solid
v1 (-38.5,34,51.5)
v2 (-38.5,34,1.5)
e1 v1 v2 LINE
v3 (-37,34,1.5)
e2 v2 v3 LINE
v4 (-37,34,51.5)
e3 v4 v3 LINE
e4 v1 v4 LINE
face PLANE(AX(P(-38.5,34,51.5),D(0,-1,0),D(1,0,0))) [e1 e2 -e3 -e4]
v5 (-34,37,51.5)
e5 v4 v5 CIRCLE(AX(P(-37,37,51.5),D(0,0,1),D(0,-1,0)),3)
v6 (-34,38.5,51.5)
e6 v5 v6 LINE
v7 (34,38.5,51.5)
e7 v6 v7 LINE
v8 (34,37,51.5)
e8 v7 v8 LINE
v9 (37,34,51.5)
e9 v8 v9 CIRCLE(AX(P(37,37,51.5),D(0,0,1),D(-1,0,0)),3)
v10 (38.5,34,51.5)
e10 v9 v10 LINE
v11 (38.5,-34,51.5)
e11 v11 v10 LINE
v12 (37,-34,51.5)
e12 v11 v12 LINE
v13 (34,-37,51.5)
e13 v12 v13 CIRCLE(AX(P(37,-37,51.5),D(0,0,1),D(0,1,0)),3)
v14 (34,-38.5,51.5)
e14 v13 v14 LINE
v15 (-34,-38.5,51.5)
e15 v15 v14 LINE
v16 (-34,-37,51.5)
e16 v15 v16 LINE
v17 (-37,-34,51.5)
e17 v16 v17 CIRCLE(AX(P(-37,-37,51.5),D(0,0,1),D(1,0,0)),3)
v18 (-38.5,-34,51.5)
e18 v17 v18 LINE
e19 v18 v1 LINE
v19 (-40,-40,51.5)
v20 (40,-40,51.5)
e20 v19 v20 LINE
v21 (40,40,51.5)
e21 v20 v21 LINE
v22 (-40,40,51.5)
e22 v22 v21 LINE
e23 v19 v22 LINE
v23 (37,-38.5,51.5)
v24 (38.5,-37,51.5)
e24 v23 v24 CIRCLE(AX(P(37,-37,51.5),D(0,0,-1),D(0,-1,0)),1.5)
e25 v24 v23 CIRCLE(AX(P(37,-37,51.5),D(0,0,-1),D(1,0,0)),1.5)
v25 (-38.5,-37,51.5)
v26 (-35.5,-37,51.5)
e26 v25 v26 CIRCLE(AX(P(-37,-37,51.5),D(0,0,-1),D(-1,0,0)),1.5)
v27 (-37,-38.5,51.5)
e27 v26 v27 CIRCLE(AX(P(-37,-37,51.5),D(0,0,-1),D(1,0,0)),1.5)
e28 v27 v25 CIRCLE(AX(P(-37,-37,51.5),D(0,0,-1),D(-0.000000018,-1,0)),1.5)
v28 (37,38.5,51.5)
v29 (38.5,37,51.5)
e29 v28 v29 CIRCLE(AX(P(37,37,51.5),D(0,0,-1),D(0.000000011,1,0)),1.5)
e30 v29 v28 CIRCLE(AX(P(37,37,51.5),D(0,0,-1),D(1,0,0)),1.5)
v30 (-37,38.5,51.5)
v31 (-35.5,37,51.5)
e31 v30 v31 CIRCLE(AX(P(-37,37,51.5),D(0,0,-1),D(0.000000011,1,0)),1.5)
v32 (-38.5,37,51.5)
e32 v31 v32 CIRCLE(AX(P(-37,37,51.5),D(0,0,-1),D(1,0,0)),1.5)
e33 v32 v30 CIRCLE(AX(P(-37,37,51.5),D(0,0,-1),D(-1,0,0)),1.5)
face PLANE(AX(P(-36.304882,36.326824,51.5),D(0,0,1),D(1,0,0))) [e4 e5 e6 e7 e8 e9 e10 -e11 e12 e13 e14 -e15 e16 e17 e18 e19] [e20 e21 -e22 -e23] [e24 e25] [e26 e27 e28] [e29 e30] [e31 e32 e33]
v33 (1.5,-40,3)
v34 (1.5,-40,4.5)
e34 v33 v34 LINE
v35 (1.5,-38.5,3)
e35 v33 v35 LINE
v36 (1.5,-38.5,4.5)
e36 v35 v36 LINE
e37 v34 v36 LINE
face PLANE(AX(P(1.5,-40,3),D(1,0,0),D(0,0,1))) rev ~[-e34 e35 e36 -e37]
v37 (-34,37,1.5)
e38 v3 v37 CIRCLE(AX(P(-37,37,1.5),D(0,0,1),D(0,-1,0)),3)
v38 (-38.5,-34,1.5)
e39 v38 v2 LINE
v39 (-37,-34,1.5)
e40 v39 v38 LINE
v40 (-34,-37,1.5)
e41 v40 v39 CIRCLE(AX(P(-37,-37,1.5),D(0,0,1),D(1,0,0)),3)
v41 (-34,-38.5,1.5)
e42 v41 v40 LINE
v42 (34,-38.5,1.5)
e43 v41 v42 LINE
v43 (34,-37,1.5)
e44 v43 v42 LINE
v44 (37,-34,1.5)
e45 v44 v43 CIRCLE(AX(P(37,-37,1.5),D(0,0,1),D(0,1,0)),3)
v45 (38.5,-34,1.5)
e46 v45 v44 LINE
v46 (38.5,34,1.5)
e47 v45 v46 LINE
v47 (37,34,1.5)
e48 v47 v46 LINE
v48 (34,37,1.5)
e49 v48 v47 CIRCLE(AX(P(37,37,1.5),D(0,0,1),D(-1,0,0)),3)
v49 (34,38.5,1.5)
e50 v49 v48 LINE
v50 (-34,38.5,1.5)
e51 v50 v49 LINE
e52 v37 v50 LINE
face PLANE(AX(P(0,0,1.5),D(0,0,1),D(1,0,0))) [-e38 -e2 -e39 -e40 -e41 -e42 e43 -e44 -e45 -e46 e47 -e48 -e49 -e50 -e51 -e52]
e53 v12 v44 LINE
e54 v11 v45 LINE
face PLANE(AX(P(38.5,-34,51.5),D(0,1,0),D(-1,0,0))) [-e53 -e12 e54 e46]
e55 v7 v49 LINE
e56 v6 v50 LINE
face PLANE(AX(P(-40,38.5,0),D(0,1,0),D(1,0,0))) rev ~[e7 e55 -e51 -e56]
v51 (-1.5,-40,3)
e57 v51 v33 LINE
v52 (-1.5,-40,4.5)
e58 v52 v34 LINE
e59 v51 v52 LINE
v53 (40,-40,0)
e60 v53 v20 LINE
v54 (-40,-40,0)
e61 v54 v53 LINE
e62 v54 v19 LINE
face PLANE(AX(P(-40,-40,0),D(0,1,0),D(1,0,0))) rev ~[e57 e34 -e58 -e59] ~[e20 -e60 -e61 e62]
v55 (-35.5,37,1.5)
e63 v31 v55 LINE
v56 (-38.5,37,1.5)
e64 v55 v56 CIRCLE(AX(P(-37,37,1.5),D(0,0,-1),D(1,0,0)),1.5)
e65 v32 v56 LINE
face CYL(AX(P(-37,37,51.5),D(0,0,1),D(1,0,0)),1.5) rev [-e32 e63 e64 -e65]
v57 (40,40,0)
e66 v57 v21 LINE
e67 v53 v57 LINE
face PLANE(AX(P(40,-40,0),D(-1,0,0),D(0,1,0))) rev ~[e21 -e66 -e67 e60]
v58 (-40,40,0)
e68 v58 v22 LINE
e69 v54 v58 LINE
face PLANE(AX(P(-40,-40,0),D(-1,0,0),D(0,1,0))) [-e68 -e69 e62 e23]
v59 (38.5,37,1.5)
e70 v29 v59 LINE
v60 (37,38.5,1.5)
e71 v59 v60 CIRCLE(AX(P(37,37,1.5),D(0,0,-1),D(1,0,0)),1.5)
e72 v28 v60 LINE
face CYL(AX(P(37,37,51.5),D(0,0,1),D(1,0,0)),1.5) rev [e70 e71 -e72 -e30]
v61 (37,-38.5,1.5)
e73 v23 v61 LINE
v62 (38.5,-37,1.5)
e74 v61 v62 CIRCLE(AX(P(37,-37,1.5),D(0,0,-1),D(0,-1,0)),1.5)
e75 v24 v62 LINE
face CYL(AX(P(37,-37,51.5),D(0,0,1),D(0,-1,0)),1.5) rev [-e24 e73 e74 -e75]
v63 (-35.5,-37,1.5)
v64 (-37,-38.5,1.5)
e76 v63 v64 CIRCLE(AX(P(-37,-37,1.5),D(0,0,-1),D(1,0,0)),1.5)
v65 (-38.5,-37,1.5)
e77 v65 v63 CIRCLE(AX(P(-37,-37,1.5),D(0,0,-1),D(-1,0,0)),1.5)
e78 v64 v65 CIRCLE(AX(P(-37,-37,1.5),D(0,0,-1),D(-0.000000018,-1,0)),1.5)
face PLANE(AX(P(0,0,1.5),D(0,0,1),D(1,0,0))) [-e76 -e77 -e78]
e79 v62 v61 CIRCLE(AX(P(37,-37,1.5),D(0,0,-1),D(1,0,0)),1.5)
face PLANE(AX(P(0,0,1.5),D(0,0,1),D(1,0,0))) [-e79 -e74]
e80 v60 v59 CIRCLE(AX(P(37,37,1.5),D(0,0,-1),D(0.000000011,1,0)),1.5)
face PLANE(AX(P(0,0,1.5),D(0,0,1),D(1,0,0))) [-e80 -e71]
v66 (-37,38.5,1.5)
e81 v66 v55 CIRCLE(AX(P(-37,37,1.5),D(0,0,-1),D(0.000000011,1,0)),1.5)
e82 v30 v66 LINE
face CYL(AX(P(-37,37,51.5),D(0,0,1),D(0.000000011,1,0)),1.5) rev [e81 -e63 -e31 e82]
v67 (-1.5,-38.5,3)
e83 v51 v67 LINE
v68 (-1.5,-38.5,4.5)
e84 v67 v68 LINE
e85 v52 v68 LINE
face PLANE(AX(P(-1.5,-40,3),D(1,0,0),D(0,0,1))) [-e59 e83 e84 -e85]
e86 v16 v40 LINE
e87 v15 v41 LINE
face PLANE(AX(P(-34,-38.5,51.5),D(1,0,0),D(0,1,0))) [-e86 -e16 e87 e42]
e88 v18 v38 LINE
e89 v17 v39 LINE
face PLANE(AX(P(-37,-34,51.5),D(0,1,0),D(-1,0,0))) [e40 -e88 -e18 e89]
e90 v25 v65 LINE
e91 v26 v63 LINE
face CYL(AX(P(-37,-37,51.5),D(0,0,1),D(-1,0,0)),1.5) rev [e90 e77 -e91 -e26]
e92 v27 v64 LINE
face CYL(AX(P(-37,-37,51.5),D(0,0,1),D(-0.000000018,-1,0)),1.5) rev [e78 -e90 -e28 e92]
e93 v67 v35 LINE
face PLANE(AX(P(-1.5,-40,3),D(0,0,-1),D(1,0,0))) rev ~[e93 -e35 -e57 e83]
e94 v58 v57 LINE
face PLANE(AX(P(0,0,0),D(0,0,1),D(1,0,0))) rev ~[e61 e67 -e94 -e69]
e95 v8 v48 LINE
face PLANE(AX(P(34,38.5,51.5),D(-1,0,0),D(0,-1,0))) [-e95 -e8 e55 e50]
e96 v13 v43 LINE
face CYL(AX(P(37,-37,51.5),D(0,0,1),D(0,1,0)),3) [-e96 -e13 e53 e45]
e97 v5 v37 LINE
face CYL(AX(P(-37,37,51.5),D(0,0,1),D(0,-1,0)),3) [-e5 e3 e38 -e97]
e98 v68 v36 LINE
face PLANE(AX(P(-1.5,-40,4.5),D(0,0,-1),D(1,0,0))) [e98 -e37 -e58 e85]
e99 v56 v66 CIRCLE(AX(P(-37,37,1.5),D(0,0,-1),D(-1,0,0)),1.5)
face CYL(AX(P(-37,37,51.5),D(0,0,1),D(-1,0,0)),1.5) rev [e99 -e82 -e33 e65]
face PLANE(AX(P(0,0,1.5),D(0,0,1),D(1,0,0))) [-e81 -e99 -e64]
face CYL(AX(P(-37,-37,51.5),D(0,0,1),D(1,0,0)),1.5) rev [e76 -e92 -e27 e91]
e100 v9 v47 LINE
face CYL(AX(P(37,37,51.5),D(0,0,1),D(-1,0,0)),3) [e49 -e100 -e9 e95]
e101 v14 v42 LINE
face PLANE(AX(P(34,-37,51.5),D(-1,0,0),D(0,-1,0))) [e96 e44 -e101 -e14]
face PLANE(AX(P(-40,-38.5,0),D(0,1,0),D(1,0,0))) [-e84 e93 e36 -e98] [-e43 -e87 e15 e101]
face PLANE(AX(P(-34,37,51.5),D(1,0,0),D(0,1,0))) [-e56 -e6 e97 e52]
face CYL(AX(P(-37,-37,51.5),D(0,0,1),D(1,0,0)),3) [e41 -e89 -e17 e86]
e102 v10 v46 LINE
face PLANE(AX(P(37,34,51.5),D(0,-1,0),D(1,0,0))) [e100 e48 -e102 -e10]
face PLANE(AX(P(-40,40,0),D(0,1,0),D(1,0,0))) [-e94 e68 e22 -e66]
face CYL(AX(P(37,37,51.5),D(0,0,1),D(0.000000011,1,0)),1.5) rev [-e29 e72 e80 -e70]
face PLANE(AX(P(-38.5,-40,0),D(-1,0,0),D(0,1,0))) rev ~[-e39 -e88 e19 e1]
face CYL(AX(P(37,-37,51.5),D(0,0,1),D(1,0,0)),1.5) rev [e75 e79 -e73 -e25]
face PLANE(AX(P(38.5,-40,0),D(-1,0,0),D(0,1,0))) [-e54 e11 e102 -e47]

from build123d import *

# Parameters (mm, degrees)
F0_W     = 80
F0_H     = 80
F1_DEPTH = 51.5
F2_T     = -1.5
F4_DEPTH = 50
F5_W     = 3
F5_H     = 1.5
F6_DEPTH = 1.5


with BuildPart() as f1:
    # F0 (on Top) → F1 (new body)
    with BuildSketch(Plane.XY):
        Rectangle(F0_W, F0_H)
    extrude(amount=F1_DEPTH)

    # F2
    f2_openings = [f1.faces().sort_by_distance(p)[0] for p in [
        (0, 0, 51.5),
    ]]
    offset(amount=F2_T, openings=f2_openings)

    # F3 (on face) → F4 (join, through all)
    with BuildSketch(Plane.XY.offset(51.5)):
        with BuildLine():
            ThreePointArc((-36.9999999833, 38.5), (-35.9393398223, 38.0606601659), (-35.5, 37))
            ThreePointArc((-35.5, 37), (-37, 35.5), (-38.5, 37))
            Line((-38.5, 37), (-38.5, 34))
            Line((-38.5, 34), (-37, 34))
            ThreePointArc((-37, 34), (-34.8786796564, 34.8786796564), (-34, 37))
            Line((-34, 37), (-34, 38.5))
            Line((-34, 38.5), (-36.9999999833, 38.5))
        make_face()
        with BuildLine():
            ThreePointArc((-38.5, 37), (-38.0606601659, 38.0606601777), (-36.9999999833, 38.5))
            Line((-36.9999999833, 38.5), (-38.5, 38.5))
            Line((-38.5, 38.5), (-38.5, 37))
        make_face()
        with BuildLine():
            Line((-37, -34), (-38.5, -34))
            Line((-38.5, -34), (-38.5, -37))
            ThreePointArc((-38.5, -37), (-37, -35.5), (-35.5, -37))
            ThreePointArc((-35.5, -37), (-35.9393398378, -38.0606601813), (-37.0000000271, -38.5))
            Line((-37.0000000271, -38.5), (-34, -38.5))
            Line((-34, -38.5), (-34, -37))
            ThreePointArc((-34, -37), (-34.8786796564, -34.8786796564), (-37, -34))
        make_face()
        with BuildLine():
            ThreePointArc((-37.0000000271, -38.5), (-38.0606601813, -38.0606601622), (-38.5, -37))
            Line((-38.5, -37), (-38.5, -38.5))
            Line((-38.5, -38.5), (-37.0000000271, -38.5))
        make_face()
        with BuildLine():
            Line((38.5, -37), (38.5, -34))
            Line((38.5, -34), (37, -34))
            ThreePointArc((37, -34), (34.8786796564, -34.8786796564), (34, -37))
            Line((34, -37), (34, -38.5))
            Line((34, -38.5), (37, -38.5))
            ThreePointArc((37, -38.5), (35.9393398282, -35.9393398282), (38.5, -37))
        make_face()
        with BuildLine():
            Line((38.5, -38.5), (38.5, -37))
            ThreePointArc((38.5, -37), (38.0606601718, -38.0606601718), (37, -38.5))
            Line((37, -38.5), (38.5, -38.5))
        make_face()
        with BuildLine():
            Line((37.0000000167, 38.5), (34, 38.5))
            Line((34, 38.5), (34, 37))
            ThreePointArc((34, 37), (34.8786796564, 34.8786796564), (37, 34))
            Line((37, 34), (38.5, 34))
            Line((38.5, 34), (38.5, 37))
            ThreePointArc((38.5, 37), (35.9393398223, 35.9393398341), (37.0000000167, 38.5))
        make_face()
        with BuildLine():
            Line((38.5, 38.5), (37.0000000167, 38.5))
            ThreePointArc((37.0000000167, 38.5), (38.0606601777, 38.0606601659), (38.5, 37))
            Line((38.5, 37), (38.5, 38.5))
        make_face()
    extrude(amount=-F4_DEPTH)

    # F5 (on face) → F6 (cut, through all)
    with BuildSketch(Plane.XZ.offset(40)):
        with Locations((0, 3.75)):
            Rectangle(F5_W, F5_H)
    extrude(amount=-F6_DEPTH, mode=Mode.SUBTRACT)


solid = f1.part
